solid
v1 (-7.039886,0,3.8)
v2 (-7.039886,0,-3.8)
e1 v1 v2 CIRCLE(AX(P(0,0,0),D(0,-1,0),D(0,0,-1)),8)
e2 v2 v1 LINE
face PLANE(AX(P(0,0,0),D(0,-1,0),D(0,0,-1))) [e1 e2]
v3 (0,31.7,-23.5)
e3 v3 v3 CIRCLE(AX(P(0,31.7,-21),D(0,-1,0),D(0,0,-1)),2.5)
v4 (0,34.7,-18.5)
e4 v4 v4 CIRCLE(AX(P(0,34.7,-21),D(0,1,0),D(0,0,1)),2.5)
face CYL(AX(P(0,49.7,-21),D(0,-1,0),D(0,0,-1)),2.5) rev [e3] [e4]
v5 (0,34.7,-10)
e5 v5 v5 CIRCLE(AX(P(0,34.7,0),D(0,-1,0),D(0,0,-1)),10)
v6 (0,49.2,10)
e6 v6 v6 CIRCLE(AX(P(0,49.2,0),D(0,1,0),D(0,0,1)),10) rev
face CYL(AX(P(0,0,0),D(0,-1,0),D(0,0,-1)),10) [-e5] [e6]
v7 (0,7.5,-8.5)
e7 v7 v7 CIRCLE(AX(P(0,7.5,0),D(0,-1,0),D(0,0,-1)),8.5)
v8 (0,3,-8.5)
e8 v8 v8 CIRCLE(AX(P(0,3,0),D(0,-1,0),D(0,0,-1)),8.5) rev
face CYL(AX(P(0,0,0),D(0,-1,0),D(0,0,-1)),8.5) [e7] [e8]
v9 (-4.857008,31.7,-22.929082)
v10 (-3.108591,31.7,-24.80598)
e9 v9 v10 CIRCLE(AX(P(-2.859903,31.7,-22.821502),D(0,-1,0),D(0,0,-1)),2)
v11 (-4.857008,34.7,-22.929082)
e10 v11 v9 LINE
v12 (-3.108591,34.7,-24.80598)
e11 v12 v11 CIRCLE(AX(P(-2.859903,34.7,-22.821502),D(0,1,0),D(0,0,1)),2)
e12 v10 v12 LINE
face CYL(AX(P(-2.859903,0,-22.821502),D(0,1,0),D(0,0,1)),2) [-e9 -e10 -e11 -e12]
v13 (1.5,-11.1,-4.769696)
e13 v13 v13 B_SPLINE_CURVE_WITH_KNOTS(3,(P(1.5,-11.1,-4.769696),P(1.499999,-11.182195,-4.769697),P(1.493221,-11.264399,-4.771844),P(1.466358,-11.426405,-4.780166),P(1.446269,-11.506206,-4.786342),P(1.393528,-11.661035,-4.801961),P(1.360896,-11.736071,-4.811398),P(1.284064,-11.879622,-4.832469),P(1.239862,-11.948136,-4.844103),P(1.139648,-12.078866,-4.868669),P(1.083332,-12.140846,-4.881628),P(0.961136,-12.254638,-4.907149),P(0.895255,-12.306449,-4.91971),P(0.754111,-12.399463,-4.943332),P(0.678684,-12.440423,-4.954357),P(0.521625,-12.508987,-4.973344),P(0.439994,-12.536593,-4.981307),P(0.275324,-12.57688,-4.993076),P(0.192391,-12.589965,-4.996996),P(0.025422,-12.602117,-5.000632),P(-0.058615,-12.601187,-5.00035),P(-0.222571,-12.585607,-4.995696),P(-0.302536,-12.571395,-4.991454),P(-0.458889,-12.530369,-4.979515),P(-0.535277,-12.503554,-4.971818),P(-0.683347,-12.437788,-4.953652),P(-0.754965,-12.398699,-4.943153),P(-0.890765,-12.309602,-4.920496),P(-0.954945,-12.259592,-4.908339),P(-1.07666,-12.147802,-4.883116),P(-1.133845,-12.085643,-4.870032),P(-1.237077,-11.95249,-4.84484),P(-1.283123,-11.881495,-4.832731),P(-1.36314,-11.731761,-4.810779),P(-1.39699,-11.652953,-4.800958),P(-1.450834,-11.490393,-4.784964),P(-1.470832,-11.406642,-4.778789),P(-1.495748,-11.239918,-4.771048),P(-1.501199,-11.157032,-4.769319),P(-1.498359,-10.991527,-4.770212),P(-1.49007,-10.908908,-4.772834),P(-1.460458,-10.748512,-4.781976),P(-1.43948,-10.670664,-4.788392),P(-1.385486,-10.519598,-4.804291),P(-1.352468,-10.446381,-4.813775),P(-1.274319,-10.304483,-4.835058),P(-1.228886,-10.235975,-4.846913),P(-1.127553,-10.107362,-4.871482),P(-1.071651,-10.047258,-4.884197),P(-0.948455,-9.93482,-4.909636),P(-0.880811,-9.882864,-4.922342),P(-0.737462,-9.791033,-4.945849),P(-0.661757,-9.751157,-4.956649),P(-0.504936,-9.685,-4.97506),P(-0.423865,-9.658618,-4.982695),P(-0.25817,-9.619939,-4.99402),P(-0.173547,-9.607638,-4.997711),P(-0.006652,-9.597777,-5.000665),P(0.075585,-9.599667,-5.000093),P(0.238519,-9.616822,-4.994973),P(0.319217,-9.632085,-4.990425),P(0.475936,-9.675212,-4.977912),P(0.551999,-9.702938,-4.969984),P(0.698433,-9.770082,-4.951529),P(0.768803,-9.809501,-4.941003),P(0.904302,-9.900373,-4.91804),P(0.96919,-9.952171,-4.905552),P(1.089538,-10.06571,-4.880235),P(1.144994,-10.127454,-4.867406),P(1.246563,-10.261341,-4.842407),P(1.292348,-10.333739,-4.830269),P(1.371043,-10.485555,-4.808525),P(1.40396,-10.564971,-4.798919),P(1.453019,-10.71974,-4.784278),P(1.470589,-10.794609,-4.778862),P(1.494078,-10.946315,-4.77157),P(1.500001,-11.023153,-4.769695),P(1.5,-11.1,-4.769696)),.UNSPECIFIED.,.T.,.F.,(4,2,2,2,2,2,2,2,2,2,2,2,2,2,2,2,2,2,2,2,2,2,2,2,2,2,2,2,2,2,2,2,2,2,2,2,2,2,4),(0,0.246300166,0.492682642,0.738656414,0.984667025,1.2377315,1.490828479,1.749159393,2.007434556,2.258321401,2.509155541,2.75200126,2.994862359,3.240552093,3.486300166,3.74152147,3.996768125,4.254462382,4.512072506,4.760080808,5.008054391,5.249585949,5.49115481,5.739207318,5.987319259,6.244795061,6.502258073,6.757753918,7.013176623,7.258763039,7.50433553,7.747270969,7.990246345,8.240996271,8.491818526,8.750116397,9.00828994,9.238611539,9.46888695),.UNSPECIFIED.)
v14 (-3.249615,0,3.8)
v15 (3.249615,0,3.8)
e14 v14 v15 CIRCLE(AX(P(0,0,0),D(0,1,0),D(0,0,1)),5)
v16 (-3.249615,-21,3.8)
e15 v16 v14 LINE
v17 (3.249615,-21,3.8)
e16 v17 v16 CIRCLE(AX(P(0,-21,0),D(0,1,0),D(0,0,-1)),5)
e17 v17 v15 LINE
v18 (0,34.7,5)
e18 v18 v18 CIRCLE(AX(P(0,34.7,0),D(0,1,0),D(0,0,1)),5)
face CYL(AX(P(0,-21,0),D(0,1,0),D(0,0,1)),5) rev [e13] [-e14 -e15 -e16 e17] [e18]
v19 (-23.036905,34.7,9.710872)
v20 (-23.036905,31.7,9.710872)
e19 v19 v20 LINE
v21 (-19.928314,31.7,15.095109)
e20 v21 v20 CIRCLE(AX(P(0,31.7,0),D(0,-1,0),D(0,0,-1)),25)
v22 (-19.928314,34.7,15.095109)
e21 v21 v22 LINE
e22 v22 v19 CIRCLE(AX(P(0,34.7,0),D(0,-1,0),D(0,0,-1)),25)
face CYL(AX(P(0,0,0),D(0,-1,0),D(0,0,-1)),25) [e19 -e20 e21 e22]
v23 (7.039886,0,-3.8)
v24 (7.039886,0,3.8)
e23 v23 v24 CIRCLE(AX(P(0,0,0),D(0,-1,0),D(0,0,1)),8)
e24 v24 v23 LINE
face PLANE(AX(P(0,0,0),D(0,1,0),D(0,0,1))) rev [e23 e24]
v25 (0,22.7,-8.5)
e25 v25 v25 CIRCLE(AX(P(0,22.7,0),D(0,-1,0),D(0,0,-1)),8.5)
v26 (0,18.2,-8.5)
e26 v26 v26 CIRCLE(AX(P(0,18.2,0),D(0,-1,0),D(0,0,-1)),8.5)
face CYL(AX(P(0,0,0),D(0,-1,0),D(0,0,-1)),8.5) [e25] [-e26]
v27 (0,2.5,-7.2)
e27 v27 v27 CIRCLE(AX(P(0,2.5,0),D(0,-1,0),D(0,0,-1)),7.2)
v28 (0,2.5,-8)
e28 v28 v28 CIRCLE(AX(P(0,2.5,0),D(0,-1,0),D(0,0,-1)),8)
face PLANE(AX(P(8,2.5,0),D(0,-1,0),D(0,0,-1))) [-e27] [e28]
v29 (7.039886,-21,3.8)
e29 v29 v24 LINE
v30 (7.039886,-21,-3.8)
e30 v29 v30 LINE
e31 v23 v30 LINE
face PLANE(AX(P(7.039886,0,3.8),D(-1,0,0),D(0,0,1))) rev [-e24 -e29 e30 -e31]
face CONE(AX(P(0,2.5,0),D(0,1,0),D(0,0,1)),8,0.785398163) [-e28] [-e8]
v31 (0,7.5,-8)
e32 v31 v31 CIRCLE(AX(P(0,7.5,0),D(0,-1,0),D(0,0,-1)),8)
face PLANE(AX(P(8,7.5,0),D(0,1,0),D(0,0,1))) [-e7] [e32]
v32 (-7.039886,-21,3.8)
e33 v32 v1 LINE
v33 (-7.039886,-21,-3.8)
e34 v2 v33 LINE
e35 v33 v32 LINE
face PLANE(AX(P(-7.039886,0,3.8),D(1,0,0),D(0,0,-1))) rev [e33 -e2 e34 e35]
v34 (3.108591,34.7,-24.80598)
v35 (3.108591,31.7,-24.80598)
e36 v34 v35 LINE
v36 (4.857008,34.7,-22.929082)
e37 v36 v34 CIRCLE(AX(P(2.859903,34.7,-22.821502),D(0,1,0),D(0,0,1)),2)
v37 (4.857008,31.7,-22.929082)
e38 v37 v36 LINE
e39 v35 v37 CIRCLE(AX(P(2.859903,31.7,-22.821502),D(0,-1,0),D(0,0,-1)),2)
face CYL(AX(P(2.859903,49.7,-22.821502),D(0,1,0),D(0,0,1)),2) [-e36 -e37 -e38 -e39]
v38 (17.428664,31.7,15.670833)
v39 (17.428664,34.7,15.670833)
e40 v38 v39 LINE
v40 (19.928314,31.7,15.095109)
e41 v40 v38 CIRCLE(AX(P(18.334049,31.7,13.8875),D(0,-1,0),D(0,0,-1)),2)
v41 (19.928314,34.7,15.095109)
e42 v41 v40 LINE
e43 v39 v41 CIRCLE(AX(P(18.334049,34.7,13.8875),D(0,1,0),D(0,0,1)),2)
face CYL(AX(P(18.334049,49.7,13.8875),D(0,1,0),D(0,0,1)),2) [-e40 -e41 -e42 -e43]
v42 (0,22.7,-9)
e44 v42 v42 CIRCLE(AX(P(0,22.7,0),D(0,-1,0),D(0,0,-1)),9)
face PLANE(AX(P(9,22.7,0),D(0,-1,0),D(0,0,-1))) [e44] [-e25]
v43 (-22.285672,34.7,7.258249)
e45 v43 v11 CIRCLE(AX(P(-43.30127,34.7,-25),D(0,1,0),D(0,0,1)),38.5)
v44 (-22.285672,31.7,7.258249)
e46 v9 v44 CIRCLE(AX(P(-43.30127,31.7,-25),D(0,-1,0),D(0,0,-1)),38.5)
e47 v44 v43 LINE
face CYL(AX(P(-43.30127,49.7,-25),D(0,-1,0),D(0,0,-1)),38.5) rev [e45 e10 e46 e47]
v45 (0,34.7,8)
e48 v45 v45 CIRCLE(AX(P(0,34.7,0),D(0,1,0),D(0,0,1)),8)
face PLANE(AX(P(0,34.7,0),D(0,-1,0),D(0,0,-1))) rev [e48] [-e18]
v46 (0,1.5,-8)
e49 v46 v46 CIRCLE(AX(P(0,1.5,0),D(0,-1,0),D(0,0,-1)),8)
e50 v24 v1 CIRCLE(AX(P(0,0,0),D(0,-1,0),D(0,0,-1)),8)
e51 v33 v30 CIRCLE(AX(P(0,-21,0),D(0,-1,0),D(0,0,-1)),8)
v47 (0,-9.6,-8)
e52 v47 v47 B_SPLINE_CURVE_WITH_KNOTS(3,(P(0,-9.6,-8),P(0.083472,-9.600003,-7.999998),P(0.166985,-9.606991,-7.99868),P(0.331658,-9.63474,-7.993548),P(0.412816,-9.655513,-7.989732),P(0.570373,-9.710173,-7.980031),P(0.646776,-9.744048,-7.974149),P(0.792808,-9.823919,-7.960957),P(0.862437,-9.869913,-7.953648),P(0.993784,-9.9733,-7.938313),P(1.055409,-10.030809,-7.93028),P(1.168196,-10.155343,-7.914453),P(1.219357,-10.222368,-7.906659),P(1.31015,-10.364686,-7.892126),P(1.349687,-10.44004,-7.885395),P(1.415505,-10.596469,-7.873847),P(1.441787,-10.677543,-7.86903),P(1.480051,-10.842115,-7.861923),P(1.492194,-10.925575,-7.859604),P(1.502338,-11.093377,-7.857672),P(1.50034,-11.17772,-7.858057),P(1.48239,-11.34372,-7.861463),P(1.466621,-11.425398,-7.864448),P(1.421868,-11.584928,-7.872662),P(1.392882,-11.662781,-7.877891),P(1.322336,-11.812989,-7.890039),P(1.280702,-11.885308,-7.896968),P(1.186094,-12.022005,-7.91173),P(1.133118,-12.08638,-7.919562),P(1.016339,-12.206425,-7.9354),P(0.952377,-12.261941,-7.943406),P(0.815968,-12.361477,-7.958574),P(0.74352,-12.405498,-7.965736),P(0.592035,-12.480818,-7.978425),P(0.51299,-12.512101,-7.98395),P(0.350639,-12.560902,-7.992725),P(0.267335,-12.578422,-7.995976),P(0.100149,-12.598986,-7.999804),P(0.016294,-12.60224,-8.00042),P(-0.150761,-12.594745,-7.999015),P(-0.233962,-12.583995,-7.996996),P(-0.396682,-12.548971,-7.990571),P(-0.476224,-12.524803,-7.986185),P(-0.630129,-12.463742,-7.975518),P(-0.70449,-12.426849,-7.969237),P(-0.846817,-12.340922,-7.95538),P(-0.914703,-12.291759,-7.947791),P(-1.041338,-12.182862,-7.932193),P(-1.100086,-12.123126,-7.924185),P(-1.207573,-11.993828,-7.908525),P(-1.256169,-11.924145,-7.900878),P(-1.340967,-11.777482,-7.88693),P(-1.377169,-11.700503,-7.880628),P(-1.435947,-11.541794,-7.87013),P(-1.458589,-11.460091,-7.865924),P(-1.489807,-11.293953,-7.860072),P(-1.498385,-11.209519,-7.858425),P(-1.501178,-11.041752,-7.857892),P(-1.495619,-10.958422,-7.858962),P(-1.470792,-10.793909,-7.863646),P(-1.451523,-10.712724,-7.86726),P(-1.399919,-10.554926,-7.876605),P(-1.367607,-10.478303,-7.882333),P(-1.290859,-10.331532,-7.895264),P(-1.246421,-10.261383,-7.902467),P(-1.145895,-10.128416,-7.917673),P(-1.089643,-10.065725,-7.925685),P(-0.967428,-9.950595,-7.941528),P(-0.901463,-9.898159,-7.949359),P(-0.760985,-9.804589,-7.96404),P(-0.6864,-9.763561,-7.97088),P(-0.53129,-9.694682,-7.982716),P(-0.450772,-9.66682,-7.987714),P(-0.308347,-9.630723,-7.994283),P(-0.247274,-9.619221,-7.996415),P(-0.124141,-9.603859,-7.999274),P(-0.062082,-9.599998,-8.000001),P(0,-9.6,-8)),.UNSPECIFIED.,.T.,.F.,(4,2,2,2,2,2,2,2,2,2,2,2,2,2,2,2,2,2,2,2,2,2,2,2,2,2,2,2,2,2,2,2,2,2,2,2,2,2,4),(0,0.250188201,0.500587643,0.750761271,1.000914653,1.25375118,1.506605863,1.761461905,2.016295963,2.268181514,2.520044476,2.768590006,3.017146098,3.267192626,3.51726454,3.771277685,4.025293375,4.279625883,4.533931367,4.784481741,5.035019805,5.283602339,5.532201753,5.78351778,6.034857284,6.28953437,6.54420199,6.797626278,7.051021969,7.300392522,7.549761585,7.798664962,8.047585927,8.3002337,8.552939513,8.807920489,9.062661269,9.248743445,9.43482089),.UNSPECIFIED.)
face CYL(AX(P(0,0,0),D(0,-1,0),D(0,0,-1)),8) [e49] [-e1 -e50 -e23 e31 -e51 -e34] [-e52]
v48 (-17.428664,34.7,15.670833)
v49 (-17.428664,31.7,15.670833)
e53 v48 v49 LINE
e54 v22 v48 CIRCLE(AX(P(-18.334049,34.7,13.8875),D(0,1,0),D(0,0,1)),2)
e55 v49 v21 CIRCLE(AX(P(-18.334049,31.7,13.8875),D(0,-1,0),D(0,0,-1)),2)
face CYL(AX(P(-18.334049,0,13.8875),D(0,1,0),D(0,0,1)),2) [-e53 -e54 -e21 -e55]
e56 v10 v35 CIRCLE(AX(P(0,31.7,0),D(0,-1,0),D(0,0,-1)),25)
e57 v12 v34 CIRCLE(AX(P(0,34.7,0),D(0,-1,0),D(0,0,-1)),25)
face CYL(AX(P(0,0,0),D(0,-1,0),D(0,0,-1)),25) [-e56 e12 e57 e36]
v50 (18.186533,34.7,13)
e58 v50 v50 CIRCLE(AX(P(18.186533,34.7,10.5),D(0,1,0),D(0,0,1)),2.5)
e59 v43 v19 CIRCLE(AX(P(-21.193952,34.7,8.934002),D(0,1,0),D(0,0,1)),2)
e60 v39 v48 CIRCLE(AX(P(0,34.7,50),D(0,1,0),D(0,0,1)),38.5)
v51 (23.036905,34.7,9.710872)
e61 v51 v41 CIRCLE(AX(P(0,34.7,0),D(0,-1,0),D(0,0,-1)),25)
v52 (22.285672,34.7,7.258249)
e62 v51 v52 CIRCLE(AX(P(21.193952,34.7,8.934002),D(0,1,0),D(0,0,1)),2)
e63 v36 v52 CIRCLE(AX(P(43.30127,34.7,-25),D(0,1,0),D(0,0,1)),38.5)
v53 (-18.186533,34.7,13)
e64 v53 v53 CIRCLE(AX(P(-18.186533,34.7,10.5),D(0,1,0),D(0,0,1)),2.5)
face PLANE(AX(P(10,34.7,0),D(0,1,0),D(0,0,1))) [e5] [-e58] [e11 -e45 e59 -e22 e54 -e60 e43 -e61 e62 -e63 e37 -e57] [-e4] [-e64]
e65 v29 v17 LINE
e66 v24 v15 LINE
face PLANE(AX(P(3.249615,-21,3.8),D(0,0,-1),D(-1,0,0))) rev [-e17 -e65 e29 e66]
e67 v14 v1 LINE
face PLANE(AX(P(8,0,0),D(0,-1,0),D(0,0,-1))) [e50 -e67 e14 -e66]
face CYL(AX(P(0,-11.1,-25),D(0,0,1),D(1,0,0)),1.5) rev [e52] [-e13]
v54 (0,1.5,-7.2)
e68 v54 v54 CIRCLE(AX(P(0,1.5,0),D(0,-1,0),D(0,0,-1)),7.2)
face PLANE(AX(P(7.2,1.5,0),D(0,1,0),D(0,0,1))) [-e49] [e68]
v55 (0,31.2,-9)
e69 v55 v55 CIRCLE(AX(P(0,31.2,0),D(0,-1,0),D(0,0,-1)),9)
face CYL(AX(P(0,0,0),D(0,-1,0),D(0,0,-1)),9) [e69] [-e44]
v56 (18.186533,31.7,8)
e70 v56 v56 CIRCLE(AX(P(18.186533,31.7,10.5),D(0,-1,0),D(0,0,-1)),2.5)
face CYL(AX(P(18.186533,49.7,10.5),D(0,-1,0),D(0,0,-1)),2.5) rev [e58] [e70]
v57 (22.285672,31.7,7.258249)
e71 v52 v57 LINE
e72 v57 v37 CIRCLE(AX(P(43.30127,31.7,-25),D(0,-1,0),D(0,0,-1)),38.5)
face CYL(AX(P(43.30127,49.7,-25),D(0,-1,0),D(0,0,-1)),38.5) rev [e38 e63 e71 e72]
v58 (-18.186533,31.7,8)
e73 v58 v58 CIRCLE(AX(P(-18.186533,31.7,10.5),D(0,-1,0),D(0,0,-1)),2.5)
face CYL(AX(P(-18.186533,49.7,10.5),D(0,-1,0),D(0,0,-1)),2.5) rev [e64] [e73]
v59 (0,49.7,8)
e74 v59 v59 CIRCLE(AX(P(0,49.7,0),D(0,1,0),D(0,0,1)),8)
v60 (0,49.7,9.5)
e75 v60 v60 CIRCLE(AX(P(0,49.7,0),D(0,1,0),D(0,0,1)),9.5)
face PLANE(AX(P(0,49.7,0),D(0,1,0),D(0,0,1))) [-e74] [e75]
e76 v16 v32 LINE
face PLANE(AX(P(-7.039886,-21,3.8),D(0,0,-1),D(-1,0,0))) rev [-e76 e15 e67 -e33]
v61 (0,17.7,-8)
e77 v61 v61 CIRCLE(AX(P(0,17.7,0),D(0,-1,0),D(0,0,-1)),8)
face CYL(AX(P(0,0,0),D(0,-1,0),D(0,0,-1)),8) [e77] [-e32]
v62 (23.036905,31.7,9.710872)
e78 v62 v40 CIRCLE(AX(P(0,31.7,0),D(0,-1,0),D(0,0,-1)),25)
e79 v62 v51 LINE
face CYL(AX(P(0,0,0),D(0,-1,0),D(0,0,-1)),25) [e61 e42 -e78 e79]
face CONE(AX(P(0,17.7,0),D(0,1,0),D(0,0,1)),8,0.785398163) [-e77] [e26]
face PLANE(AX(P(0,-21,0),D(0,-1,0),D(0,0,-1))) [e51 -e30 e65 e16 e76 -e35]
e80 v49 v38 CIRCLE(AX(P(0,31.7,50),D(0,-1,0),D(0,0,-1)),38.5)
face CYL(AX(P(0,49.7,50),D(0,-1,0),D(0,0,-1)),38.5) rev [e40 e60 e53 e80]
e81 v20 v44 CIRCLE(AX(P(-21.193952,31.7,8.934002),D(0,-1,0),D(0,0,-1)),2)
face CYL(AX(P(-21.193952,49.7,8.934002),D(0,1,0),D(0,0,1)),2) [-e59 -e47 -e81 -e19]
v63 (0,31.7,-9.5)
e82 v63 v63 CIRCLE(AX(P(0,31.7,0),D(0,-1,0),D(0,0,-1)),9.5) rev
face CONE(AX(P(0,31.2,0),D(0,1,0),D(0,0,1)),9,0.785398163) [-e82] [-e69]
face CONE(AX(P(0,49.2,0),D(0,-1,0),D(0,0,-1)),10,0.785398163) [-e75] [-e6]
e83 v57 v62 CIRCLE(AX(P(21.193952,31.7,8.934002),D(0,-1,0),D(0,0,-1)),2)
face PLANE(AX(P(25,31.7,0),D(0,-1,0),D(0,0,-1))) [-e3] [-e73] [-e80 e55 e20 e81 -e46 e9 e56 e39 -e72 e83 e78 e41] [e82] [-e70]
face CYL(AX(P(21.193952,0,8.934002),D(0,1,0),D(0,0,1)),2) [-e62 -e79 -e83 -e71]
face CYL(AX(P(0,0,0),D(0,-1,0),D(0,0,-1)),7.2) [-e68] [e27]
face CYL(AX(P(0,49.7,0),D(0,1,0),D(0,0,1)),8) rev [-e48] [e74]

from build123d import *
from build123d.topology import SkipClean

# Parameters (mm, degrees)
EXTRUDE_START       = 21
EXTRUDE_1_DEPTH     = 21
SKETCH_5_R          = 2.5
CUT_EXTRUDE_1_DEPTH = 64.460932864
CHAMFER_1_SIZE      = 0.5
FILLET_1_R          = 2
SKETCH_9_R          = 1.5
CUT_EXTRUDE_2_DEPTH = 62.947473135
CUT_EXTRUDE_4_DEPTH = 21


with BuildPart() as part:
    # 草图2 → 旋转1 (revolve)
    with BuildSketch(Plane.XY, mode=Mode.PRIVATE) as revolve_1_sk:
        Polygon((0, 0), (0, 49.7), (10, 49.7), (10, 34.7), (25, 34.7), (25, 31.7), (9, 31.7), (9, 22.7), (8.5, 22.7), (8.5, 18.2), (8, 18.2), (8, 7.5), (8.5, 7.5), (8.5, 2.5), (8, 2.5), (7.2, 2.5), (7.2, 1.5), (8, 1.5), (8, 0), align=None)
    revolve(revolve_1_sk.sketch.rotate(Axis((0, 0, 0), (0, 1, 0)), 90), axis=Axis((0, 0, 0), (0, 1, 0)))

    # 草图3 → 凸台-拉伸1 (add)
    with BuildSketch(Plane.XZ.offset(EXTRUDE_START)):
        with BuildLine():
            Line((-7.039886363, 3.8), (-3.249615362, 3.8))
            ThreePointArc((-3.249615362, 3.8), (0, -5), (3.249615362, 3.8))
            Line((3.249615362, 3.8), (7.039886363, 3.8))
            ThreePointArc((7.039886363, 3.8), (0, -8), (-7.039886363, 3.8))
        make_face()
    extrude(amount=-EXTRUDE_1_DEPTH)

    # 草图5 → 切除-拉伸1 (cut, through all)
    with BuildSketch(Plane.XZ.offset(-31.7)):
        with BuildLine():
            ThreePointArc((-4.80408962, -24.534072693), (-9.959292144, -5.75), (-23.649175021, 8.106572693))
            ThreePointArc((-23.649175021, 8.106572693), (-21.650635095, -12.5), (-4.80408962, -24.534072693))
        make_face()
        with BuildLine():
            ThreePointArc((25, 0), (24.659981504, 4.109174155), (23.649175021, 8.106572693))
            ThreePointArc((23.649175021, 8.106572693), (9.959292144, -5.75), (4.80408962, -24.534072693))
            ThreePointArc((4.80408962, -24.534072693), (19.301583361, -15.888639959), (25, 0))
        make_face()
        with BuildLine():
            ThreePointArc((18.8450854, 16.4275), (0, 25), (-18.8450854, 16.4275))
            ThreePointArc((-18.8450854, 16.4275), (0, 11.5), (18.8450854, 16.4275))
        make_face()
        with Locations(Location((0, -21, 0), (0, 0, 270))):
            Circle(SKETCH_5_R)
        with Locations(Location((18.186533479, 10.5, 0), (0, 0, 270))):
            Circle(SKETCH_5_R)
        with Locations(Location((-18.186533479, 10.5, 0), (0, 0, 270))):
            Circle(SKETCH_5_R)
    extrude(amount=-CUT_EXTRUDE_1_DEPTH, mode=Mode.SUBTRACT)

    # 倒角1
    chamfer_1_edges = [part.edges().sort_by_distance(p)[0] for p in [
        (0, 2.5, 8.5),
        (0, 18.2, 8),
        (0, 31.7, 9),
        (0, 49.7, 10),
    ]]
    chamfer(chamfer_1_edges, length=CHAMFER_1_SIZE - 0.0001)  # a hair under: the kernel refuses the full size

    # 圆角1
    fillet_1_edges = [part.edges().sort_by_distance(p)[0] for p in [
        (-18.8450854, 33.2, 16.4275),
        (18.8450854, 33.2, 16.4275),
        (23.649175021, 33.2, 8.106572693),
        (4.80408962, 33.2, -24.534072693),
        (-4.80408962, 33.2, -24.534072693),
        (-23.649175021, 33.2, 8.106572693),
    ]]
    fillet(fillet_1_edges, radius=FILLET_1_R)

    # 草图8 → 切除-旋转1 (revolve, cut)
    with BuildSketch(Plane.XY, mode=Mode.PRIVATE) as cut_revolve_1_sk:
        Polygon((8, 34.7), (5, 34.7), (5, 0), (0, 0), (0, 49.7), (8, 49.7), align=None)
    revolve(cut_revolve_1_sk.sketch.rotate(Axis((0, 49.7, 0), (0, -1, 0)), 270), axis=Axis((0, 49.7, 0), (0, -1, 0)), mode=Mode.SUBTRACT)

    # 草图9 → 切除-拉伸2 (cut, through all)
    with SkipClean():  # the faces are left unmerged after this step: merging them gives an invalid solid
        with BuildSketch(Plane.XY.offset(3.8)):
            with Locations((0, -11.1)):
                Circle(SKETCH_9_R)
        extrude(amount=-CUT_EXTRUDE_2_DEPTH, mode=Mode.SUBTRACT)

    # 草图11 → 切除-拉伸4 (cut)
    with SkipClean():  # the faces are left unmerged after this step: merging them gives an invalid solid
        with BuildSketch(Plane.XZ.offset(21)):
            with BuildLine():
                Line((-7.039886363, 3.8), (-7.039886363, -3.8))
                ThreePointArc((-7.039886363, -3.8), (-8, 0), (-7.039886363, 3.8))
            make_face()
            with BuildLine():
                Line((7.039886363, 3.8), (7.039886363, -3.8))
                ThreePointArc((7.039886363, -3.8), (8, 0), (7.039886363, 3.8))
            make_face()
        extrude(amount=-CUT_EXTRUDE_4_DEPTH, mode=Mode.SUBTRACT)


solid = part.part
